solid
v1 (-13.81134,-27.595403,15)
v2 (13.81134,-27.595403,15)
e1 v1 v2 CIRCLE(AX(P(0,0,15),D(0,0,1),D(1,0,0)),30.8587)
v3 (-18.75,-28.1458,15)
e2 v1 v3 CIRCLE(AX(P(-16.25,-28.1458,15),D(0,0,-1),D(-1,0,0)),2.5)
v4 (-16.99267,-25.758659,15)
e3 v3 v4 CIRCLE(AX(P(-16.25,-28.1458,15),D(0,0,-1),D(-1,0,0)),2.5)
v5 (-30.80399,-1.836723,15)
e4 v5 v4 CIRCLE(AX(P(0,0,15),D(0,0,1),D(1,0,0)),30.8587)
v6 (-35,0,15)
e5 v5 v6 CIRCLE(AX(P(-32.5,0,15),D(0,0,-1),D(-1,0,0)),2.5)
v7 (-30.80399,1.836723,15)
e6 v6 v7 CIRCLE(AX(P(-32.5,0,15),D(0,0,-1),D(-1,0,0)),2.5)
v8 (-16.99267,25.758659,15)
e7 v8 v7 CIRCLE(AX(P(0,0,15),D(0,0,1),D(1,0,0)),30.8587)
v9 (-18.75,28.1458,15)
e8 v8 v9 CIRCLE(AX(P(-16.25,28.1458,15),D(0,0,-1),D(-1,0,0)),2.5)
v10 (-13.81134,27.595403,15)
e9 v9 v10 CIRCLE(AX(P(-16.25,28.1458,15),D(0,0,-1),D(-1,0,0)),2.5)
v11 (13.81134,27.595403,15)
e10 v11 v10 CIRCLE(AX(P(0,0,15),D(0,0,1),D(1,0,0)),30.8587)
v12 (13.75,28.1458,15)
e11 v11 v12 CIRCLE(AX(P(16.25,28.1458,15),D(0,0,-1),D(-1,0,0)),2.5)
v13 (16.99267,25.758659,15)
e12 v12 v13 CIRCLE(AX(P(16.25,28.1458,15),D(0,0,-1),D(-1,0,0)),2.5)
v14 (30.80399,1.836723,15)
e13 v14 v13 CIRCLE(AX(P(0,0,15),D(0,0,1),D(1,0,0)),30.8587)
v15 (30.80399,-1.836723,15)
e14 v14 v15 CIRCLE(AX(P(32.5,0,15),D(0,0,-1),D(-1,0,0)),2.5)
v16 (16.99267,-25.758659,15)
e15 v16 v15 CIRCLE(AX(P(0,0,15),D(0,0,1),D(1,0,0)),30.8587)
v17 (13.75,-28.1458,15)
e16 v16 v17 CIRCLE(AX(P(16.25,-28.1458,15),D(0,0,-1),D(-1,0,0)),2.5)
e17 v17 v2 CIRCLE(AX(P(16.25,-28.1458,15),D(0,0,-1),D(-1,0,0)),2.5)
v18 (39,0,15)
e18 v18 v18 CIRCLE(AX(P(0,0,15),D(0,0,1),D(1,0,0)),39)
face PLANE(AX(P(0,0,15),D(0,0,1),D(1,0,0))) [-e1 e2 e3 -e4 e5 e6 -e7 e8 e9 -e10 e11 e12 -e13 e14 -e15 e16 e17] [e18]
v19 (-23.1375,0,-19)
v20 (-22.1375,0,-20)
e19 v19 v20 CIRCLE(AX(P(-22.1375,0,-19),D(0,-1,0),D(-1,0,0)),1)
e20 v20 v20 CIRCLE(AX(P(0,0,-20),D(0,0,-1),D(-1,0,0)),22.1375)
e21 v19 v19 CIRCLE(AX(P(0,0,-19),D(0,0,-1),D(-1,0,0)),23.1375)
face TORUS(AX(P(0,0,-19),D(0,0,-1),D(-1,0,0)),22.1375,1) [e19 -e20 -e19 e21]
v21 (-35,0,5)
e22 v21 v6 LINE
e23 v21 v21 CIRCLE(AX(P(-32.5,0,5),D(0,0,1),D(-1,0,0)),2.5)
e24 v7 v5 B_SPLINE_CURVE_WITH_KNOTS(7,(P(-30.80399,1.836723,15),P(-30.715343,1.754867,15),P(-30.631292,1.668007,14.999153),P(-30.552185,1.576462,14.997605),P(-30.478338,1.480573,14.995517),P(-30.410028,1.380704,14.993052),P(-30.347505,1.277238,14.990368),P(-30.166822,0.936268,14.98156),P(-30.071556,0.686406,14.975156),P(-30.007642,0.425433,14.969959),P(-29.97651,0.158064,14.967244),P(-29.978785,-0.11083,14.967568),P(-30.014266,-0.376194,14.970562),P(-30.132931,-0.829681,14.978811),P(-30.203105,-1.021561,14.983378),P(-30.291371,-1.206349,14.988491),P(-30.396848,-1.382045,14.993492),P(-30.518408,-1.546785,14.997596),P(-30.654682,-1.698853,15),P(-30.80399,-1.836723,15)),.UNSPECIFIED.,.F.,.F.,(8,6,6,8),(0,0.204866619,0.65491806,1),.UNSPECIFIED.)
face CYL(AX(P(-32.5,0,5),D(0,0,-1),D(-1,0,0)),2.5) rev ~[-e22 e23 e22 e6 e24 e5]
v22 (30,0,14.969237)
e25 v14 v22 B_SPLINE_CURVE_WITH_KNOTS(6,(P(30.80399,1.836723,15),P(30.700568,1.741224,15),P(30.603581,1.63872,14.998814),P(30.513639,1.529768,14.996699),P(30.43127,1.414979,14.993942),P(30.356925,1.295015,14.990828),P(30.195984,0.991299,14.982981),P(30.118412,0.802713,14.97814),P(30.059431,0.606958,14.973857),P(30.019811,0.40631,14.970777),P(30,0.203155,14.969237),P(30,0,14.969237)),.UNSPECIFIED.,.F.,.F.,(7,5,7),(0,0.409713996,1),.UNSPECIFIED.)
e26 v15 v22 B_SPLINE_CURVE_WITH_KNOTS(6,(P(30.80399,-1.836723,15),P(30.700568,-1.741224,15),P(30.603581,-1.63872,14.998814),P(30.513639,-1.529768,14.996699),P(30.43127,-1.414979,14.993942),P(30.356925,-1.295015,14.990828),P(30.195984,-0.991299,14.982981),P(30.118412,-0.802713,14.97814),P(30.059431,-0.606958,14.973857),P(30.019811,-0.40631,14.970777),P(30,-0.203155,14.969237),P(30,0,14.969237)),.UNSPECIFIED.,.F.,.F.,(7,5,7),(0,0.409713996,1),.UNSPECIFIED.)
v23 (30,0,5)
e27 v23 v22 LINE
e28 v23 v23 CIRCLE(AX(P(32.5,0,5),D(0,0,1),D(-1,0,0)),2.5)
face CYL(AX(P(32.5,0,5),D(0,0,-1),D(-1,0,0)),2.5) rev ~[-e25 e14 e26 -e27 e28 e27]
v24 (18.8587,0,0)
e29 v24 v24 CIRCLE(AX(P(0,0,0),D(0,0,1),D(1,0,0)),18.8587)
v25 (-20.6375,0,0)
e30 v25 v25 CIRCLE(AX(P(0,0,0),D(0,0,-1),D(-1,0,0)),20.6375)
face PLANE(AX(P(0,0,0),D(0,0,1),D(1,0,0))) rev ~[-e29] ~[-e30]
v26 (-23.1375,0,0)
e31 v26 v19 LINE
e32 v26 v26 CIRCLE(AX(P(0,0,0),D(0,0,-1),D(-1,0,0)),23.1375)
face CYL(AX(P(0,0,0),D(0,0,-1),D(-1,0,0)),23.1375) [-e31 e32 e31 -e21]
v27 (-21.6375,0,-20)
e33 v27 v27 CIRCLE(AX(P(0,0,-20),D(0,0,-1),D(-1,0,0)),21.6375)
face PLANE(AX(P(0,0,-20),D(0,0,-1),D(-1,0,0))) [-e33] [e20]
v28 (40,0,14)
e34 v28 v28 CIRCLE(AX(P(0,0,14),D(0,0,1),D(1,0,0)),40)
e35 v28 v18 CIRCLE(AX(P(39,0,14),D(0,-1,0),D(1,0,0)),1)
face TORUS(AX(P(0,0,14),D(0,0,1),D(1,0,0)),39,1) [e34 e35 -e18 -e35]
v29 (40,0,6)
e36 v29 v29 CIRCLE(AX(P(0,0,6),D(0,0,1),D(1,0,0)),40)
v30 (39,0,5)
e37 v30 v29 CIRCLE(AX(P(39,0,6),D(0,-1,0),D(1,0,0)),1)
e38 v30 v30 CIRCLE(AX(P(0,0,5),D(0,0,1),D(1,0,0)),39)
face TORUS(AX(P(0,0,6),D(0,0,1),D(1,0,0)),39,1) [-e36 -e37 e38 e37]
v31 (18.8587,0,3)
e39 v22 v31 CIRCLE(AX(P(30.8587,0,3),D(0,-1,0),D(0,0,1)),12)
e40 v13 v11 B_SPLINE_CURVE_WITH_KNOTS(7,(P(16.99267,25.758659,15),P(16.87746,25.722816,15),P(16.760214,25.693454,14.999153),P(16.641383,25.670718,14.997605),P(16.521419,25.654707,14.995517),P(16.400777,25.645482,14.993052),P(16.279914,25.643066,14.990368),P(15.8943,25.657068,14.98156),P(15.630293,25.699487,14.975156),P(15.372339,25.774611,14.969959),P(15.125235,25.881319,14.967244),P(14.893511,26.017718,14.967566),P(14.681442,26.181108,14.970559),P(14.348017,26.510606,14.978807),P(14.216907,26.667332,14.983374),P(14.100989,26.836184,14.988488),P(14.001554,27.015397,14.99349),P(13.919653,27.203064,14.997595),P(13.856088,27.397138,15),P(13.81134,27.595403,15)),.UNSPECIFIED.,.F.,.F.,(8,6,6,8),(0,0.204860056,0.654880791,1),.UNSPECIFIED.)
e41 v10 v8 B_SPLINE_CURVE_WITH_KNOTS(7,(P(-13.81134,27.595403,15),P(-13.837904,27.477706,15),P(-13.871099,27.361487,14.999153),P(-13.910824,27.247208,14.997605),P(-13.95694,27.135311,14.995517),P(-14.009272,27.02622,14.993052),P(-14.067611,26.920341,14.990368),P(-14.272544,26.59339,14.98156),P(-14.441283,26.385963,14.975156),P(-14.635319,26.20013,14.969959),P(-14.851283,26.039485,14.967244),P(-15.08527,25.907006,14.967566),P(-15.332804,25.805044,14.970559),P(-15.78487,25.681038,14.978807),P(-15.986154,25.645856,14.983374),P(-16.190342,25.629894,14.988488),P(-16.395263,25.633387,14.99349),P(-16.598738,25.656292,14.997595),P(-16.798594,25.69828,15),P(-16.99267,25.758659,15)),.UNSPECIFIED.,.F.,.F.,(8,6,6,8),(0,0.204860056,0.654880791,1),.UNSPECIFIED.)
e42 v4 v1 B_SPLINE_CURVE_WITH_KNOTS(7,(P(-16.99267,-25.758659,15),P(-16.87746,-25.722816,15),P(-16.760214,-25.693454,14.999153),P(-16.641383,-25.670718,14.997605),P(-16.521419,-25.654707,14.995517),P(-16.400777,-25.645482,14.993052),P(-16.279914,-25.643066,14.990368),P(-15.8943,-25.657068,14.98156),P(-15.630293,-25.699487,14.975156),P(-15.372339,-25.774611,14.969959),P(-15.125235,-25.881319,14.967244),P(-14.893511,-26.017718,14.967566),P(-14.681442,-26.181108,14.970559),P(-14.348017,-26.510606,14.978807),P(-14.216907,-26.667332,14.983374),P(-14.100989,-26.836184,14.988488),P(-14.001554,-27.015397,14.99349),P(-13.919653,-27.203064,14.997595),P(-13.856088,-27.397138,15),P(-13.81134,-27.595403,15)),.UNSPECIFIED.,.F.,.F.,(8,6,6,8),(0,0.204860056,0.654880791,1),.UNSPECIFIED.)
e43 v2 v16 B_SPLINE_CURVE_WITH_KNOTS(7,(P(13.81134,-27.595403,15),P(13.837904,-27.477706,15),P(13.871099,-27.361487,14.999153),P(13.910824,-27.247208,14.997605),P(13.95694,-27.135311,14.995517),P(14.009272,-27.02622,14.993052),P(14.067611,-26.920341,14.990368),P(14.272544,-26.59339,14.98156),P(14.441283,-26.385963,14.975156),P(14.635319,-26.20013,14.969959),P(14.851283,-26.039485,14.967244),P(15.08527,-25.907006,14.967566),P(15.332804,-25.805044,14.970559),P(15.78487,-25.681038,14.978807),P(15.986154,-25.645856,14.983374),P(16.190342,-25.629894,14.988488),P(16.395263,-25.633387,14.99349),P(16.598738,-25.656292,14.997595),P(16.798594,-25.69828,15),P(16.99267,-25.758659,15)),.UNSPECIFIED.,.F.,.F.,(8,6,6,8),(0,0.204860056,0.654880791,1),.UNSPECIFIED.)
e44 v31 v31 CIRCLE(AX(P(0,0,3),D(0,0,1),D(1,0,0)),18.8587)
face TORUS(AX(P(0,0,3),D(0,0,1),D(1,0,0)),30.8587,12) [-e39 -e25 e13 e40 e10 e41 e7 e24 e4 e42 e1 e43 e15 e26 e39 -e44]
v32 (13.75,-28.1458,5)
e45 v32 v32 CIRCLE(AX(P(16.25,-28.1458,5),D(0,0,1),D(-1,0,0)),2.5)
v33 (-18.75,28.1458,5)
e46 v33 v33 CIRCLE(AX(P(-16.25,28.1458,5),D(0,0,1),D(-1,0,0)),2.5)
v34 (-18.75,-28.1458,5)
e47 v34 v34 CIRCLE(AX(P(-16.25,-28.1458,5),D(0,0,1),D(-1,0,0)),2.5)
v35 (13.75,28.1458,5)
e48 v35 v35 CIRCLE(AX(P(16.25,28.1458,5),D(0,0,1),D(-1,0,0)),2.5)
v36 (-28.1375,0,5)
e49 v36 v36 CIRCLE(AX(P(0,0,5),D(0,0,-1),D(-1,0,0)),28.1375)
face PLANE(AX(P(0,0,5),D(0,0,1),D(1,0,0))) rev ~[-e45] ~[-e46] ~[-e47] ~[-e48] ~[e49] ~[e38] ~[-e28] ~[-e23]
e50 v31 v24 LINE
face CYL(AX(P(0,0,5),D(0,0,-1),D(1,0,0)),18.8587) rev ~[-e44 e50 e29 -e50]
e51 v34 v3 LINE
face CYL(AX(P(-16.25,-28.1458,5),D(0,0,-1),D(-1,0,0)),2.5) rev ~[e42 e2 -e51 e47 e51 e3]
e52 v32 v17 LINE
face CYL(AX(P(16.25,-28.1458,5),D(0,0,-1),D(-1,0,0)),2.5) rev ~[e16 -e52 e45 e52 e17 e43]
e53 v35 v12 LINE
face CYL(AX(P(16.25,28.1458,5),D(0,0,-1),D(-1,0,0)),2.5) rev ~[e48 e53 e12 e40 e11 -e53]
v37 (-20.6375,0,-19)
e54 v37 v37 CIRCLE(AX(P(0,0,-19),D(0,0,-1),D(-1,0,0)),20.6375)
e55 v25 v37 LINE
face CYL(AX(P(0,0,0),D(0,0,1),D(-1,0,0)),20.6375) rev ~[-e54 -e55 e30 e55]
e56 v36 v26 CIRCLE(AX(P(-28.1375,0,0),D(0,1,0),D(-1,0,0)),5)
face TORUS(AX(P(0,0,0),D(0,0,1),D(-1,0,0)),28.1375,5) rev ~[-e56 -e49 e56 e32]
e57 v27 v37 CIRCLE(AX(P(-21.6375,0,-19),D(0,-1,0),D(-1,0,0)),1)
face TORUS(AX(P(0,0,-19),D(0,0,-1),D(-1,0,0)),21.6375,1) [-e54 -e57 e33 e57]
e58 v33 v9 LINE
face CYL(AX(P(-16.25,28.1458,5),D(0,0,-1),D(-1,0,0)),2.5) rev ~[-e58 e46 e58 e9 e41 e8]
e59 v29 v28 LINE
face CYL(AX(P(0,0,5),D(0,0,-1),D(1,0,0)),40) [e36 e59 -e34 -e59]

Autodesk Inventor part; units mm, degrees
ref_plane "YZ Plane" through (0, 0, 0) normal (1, 0, 0) x (0, 1, 0)
ref_plane "XZ Plane" through (0, 0, 0) normal (0, 1, 0) x (-1, 0, 0)
ref_plane "XY Plane" through (0, 0, 0) normal (0, 0, 1) x (1, 0, 0)
sketch "Sketch1" plane through (0, 0, 0) normal (0, 0, 1) x (1, 0, 0)
  point P0 (0, 0)
sketch "Sketch2" plane through (0, 0, 0) normal (0, 0, 1) x (1, 0, 0)
  circle A0 centre (0, 0) radius 18.8587
  circle A1 centre (0, 0) radius 20.6375
  dimension "d0" = 37.7174
  dimension "d1" = 41.275
extrude "Extrusion1" add sketch "Sketch2" along normal blind 5
sketch "Sketch3" plane through (0, 0, 0) normal (0, 0, -1) x (-1, 0, 0)
  circle A0 centre (0, 0) radius 20.6375
  circle A1 centre (0, 0) radius 23.1375
  dimension "d4" = 46.275
extrude "Extrusion2" add sketch "Sketch3" along normal blind 20 and the other way blind 5
sketch "Sketch5" plane through (0, 0, 5) normal (0, 0, 1) x (1, 0, 0)
  circle A0 centre (0, 0) radius 18.8587
  circle A1 centre (0, 0) radius 40
  dimension "d14" = 80
extrude "Extrusion4" add sketch "Sketch5" along normal blind 10
sketch "Sketch6" plane through (0, 0, 5) normal (0, 0, -1) x (-1, 0, 0)
  line L0 (0, 0) -> (-40, 0)
  circle A0 centre (0, 0) radius 40 projected
  line L1 (0, 0) -> (-30, 0)
  circle A1 centre (0, 0) radius 30
  line L2 (0, 0) -> (30, 0)
  line L3 (0, 0) -> (15, -25.9808)
  line L4 (0, 0) -> (-15, -25.9808)
  line L5 (0, 0) -> (-15, 25.9808)
  line L6 (0, 0) -> (15, 25.9808)
  circle A2 centre (-30, 0) radius 2.5
  circle A3 centre (-15, 25.9808) radius 2.5
  circle A4 centre (15, 25.9808) radius 2.5
  circle A5 centre (30, 0) radius 2.5
  circle A6 centre (15, -25.9808) radius 2.5
  circle A7 centre (-15, -25.9808) radius 2.5
  circle A8 centre (-32.5, 0) radius 2.5
  circle A9 centre (-16.25, -28.1458) radius 2.5
  circle A10 centre (16.25, -28.1458) radius 2.5
  circle A11 centre (32.5, 0) radius 2.5
  circle A12 centre (16.25, 28.1458) radius 2.5
  circle A13 centre (-16.25, 28.1458) radius 2.5
  dimension "d18" = 5
  dimension "d19" = 5
  dimension "d20" = 5
  dimension "d21" = 5
  dimension "d22" = 5
  dimension "d23" = 5
  dimension "d17" = 30
  dimension "d26" = 5
  dimension "d27" = 5
  dimension "d28" = 5
  dimension "d29" = 5
  dimension "d30" = 5
  dimension "d31" = 5
extrude "Extrusion6" cut sketch "Sketch6" against normal blind 10 contours A8 A2 L0 | L0 A2 A8 | A11 A5 | A10 A6 | A9 A7 | A13 A3 | A12 A4 | A2 A8 L0 | L0 A8 A2 | A11 A5 | A10 A6 | A9 A7 | A3 A13 | A4 A12
fillet "Fillet2" radius 5 1 edges at (23.1375, 0, 5)
fillet "Fillet3" radius 12 1 edges at (-18.8587, 0, 15)
fillet "Fillet4" radius 1 2 edges at (-40, 0, 5) (-40, 0, 15)
fillet "Fillet5" radius 1 2 edges at (20.6375, 0, -20) (23.1375, 0, -20)
properties part number "5201_Bias_Coil_Mounting_Flange_MPSv2_v2" material "Acetal Resin, White"
